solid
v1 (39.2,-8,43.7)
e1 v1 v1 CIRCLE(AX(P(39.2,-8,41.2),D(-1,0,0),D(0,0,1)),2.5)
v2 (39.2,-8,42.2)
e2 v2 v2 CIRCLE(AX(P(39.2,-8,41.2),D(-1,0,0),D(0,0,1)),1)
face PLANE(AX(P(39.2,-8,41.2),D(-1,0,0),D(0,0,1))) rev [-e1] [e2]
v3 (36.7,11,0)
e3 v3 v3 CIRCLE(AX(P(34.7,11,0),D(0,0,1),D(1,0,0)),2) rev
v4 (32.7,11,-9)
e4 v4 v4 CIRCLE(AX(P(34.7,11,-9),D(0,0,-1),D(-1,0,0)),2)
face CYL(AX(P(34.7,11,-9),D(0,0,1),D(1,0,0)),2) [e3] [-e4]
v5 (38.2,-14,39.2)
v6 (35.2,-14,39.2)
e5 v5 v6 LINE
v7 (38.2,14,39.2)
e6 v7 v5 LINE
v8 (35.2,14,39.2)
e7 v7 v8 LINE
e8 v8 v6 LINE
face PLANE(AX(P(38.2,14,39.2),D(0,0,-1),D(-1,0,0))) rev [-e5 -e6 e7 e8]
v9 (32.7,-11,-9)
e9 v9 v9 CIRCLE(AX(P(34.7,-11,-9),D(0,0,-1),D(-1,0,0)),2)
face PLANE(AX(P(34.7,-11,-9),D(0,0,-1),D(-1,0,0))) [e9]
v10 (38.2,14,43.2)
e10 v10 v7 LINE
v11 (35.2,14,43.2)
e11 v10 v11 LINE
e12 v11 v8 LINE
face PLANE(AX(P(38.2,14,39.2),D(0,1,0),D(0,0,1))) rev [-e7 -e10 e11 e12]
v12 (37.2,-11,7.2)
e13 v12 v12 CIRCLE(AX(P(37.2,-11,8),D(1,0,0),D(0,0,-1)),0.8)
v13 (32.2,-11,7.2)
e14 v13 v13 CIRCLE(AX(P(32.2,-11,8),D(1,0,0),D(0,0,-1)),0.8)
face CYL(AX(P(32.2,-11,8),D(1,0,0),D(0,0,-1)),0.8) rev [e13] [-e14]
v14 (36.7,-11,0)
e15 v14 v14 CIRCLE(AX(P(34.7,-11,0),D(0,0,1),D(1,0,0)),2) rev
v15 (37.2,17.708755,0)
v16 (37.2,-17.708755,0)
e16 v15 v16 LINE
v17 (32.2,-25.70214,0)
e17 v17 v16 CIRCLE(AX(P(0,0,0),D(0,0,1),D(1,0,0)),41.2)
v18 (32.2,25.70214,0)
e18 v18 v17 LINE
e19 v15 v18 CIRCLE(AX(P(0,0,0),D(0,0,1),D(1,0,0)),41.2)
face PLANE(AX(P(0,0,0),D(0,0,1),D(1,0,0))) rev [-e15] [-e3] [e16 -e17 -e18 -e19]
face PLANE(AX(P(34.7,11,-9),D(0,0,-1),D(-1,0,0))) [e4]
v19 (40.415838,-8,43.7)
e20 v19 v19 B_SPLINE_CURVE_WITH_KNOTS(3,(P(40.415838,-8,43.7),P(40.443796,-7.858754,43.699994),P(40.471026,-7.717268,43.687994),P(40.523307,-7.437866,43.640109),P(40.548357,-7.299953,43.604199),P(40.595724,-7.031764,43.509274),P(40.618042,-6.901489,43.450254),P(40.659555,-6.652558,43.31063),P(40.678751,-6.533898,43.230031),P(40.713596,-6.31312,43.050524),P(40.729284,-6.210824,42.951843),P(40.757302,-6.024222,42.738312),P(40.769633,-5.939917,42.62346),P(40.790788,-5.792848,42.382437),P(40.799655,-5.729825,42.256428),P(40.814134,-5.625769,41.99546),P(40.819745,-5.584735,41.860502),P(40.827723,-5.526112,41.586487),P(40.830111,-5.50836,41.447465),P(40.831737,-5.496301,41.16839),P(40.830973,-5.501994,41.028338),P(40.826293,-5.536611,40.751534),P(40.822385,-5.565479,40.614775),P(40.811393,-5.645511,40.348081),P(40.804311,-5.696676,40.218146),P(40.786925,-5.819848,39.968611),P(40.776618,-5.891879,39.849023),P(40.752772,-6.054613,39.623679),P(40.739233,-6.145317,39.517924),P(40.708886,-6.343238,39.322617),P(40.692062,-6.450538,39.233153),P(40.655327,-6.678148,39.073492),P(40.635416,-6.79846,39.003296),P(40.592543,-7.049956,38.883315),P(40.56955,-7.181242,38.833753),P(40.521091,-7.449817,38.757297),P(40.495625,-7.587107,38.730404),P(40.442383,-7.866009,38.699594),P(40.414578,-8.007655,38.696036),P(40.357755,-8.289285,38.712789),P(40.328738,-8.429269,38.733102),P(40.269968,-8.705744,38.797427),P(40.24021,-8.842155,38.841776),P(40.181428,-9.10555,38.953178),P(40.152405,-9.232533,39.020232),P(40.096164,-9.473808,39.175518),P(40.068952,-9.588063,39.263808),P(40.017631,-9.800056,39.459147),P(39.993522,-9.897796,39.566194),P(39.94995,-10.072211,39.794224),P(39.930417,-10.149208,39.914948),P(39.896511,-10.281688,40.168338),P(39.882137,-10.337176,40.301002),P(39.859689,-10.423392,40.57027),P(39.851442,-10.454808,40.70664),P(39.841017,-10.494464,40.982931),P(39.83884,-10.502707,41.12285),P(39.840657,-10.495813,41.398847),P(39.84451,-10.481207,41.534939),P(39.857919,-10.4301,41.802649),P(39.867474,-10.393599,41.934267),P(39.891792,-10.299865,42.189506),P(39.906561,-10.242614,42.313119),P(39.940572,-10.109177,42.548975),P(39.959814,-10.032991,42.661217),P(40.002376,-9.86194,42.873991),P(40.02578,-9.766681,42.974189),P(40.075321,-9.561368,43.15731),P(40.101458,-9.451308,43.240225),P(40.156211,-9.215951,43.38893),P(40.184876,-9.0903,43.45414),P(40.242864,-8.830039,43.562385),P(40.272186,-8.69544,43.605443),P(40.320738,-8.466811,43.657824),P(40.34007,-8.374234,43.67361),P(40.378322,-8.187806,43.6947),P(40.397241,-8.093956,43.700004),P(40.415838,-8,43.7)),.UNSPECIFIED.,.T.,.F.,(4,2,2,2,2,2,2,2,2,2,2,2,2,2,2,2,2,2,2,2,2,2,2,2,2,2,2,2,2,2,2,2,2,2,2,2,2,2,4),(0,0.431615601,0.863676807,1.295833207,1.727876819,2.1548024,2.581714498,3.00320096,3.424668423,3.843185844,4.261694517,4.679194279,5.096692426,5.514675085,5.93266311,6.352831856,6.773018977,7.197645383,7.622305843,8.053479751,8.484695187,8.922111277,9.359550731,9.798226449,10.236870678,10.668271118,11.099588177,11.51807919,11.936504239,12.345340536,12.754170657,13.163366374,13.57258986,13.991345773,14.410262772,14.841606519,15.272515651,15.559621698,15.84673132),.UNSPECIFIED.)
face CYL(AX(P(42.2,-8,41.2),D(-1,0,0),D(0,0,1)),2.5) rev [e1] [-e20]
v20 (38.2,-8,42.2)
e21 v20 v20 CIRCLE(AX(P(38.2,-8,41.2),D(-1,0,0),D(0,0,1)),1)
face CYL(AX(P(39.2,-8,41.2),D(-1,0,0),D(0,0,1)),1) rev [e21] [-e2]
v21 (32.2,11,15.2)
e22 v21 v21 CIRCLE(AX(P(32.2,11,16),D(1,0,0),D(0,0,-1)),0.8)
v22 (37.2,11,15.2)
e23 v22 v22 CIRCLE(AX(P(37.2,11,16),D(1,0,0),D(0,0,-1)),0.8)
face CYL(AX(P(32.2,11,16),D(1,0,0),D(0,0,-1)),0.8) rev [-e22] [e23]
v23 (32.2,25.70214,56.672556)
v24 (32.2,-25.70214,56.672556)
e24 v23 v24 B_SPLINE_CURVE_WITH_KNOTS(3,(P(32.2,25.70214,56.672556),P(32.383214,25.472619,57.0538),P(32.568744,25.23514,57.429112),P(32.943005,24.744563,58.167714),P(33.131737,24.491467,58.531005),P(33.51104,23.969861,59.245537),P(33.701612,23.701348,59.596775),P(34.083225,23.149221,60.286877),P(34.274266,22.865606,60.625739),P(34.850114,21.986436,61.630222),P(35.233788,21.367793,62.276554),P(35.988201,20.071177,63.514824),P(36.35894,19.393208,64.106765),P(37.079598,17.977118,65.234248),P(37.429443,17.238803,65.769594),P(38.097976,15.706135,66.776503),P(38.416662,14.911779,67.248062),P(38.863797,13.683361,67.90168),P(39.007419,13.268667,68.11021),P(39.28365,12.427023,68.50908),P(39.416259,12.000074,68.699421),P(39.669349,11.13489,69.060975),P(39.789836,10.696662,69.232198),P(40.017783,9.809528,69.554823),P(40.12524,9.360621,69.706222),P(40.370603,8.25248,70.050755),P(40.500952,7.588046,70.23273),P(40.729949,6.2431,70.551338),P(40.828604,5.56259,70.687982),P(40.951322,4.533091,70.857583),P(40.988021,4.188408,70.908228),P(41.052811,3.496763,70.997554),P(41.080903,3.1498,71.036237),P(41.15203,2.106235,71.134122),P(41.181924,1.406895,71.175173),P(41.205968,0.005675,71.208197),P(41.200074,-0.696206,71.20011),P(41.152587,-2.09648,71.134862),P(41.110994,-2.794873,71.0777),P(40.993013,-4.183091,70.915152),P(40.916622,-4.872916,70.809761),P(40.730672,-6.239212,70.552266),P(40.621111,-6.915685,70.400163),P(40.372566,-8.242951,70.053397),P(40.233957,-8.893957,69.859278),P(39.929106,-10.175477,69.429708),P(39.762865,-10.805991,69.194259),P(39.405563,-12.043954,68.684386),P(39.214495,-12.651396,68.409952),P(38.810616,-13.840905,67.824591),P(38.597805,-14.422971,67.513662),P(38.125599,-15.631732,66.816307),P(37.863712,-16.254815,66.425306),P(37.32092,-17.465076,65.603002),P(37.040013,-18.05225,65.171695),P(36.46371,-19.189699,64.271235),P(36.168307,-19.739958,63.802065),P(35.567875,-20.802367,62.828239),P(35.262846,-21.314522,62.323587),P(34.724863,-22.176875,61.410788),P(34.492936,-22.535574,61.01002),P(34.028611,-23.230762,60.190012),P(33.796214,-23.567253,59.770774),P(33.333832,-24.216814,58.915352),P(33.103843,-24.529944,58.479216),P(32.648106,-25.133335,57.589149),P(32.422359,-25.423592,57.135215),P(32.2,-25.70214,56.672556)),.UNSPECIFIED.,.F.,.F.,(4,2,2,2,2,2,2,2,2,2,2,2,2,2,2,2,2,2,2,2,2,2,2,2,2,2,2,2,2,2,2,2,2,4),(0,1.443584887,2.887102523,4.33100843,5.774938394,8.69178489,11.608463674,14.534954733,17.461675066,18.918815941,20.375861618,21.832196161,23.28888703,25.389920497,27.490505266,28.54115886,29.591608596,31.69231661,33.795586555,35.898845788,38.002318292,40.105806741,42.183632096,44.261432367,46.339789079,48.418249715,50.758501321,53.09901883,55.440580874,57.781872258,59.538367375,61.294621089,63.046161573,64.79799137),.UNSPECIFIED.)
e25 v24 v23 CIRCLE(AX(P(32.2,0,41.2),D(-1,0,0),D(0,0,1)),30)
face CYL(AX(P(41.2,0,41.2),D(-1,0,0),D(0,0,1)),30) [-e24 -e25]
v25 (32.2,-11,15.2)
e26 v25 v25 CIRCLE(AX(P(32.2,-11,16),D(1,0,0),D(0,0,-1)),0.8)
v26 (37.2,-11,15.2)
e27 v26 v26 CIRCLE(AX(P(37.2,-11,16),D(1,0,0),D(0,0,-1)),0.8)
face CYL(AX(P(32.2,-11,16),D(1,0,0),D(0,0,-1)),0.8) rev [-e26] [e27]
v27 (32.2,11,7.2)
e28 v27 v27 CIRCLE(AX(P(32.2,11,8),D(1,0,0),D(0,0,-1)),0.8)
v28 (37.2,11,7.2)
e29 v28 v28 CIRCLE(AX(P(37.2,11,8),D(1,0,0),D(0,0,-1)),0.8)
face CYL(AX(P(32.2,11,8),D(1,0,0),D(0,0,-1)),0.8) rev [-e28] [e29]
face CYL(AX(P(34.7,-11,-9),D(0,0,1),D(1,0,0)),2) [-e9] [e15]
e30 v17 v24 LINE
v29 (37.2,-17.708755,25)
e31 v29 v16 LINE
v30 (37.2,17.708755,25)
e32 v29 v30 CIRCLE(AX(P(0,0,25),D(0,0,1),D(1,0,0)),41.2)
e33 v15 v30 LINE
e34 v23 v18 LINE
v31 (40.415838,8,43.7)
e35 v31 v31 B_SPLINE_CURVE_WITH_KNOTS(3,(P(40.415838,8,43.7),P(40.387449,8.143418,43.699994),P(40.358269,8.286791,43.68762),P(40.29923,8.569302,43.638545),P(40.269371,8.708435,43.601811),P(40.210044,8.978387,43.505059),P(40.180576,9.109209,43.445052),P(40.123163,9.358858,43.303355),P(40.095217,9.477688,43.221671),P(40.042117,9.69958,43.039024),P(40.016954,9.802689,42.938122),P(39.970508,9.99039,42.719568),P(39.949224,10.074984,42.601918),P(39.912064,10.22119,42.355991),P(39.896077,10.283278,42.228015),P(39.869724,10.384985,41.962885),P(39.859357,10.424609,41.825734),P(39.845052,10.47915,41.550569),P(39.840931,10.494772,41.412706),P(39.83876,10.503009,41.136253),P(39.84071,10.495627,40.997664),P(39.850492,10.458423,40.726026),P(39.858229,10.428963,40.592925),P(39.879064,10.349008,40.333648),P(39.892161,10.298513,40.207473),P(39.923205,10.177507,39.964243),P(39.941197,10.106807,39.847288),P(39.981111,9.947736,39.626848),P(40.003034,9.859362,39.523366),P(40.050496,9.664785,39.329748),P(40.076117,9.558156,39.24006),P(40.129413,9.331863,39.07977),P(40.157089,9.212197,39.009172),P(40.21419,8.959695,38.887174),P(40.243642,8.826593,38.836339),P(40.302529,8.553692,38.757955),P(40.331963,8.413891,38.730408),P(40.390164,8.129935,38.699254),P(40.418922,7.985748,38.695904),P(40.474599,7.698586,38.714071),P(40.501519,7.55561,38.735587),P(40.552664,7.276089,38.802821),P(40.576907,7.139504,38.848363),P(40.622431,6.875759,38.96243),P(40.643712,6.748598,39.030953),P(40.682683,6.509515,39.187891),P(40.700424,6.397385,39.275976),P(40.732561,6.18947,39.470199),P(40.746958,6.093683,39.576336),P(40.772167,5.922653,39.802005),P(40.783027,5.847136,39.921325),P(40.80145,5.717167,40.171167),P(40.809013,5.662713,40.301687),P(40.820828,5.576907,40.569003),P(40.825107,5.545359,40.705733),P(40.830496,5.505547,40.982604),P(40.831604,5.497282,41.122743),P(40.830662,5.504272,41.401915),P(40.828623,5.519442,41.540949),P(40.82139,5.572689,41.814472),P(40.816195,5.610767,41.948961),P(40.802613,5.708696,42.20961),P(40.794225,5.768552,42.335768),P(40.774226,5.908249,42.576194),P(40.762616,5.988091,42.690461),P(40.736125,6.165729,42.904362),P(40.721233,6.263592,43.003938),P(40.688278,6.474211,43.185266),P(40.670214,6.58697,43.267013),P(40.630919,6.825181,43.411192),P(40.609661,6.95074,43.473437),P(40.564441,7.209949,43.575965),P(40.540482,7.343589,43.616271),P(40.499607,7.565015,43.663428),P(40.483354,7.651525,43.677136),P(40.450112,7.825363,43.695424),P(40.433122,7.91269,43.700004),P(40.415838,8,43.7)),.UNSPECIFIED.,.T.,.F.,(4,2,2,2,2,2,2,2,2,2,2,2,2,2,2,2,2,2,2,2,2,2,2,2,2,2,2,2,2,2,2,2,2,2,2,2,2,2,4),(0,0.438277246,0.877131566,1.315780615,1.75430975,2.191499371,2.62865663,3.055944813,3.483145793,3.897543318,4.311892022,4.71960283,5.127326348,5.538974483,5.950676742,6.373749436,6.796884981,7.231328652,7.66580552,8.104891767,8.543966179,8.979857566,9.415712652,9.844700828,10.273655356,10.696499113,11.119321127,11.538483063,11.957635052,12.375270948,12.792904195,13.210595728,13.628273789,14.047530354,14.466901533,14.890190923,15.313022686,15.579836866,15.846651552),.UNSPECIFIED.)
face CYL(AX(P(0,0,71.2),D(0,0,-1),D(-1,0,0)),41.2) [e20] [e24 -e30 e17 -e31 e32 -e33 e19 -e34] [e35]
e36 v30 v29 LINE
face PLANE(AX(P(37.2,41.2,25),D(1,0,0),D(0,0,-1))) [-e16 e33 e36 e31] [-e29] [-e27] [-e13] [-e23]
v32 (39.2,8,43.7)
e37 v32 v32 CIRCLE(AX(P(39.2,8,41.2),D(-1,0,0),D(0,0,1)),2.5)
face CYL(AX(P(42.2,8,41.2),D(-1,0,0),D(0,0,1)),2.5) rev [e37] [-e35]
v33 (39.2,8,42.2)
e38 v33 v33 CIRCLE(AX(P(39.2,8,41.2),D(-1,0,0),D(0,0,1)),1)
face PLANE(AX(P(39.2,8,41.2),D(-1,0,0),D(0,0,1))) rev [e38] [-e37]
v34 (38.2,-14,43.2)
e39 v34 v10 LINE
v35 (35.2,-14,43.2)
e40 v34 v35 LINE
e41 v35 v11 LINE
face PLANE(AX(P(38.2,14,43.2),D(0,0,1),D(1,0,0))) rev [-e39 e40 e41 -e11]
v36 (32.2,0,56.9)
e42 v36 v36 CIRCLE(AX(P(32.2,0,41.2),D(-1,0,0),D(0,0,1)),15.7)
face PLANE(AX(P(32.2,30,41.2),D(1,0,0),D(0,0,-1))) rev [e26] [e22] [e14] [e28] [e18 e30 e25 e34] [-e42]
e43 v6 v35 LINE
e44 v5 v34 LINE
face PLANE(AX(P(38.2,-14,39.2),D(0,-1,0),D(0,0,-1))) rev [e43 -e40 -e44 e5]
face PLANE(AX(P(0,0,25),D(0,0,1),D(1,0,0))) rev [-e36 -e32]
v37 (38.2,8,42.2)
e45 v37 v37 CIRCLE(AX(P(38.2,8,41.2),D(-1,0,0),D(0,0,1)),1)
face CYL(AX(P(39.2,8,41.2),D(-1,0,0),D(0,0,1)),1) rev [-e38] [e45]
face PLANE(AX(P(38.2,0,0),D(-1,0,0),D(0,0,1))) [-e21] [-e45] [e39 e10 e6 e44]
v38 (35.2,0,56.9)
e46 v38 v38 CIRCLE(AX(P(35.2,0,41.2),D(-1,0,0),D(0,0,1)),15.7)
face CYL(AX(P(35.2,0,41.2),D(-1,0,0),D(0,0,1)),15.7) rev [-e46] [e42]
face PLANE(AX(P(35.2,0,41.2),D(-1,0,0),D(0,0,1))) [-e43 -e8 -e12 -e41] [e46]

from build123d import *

# Parameters (mm, degrees)
SKETCH_1_W          = 9
SKETCH_1_H          = 60
EXTRUDE_1_DEPTH     = 41.2
SKETCH_4_R          = 30
EXTRUDE_3_DEPTH     = 9
CUT_EXTRUDE_1_DEPTH = 72
SKETCH_5_R          = 15.7
CUT_EXTRUDE_2_DEPTH = 3
SKETCH_6_W          = 4
SKETCH_6_H          = 28
CUT_EXTRUDE_3_DEPTH = 3
SKETCH_7_R          = 2
EXTRUDE_4_DEPTH     = 9
SKETCH_8_W          = 4
SKETCH_8_H          = 82.4
CUT_EXTRUDE_4_DEPTH = 25
SKETCH_9_R          = 0.8
CUT_EXTRUDE_5_DEPTH = 5
SKETCH_10_R         = 1
CUT_EXTRUDE_6_DEPTH = 1
SKETCH_11_R         = 2.5
CUT_EXTRUDE_7_DEPTH = 3


with BuildPart() as part:
    # 草图1 → 凸台-拉伸1 (new body)
    with BuildSketch(Plane.XY):
        with Locations((36.7, 0)):
            Rectangle(SKETCH_1_W, SKETCH_1_H)
    extrude(amount=EXTRUDE_1_DEPTH)

    # 草图4 → 凸台-拉伸3 (add)
    with BuildSketch(Plane.ZY.offset(-32.2)):
        with Locations((41.2, 0)):
            Circle(SKETCH_4_R)
    extrude(amount=-EXTRUDE_3_DEPTH)

    # 切除-拉伸1: read off the stored shape, not the designer's step
    # 切除-拉伸1 outline → 切除-拉伸1 (cut)
    with BuildSketch(Plane.XY):
        with BuildLine():
            Line((32.2, 30), (32.2, 25.702139989))
            ThreePointArc((32.2, 25.702139989), (38.884958532, 13.616166862), (41.2, 0))
            Line((41.2, 0), (41.2, 30))
            Line((41.2, 30), (32.2, 30))
        make_face()
        with BuildLine():
            Line((41.2, -30), (41.2, 0))
            ThreePointArc((41.2, 0), (38.884958532, -13.616166862), (32.2, -25.702139989))
            Line((32.2, -25.702139989), (32.2, -30))
            Line((32.2, -30), (41.2, -30))
        make_face()
    extrude(amount=CUT_EXTRUDE_1_DEPTH, mode=Mode.SUBTRACT)

    # 草图5 → 切除-拉伸2 (cut)
    with BuildSketch(Plane.ZY.offset(-32.2)):
        with Locations((41.2, 0)):
            Circle(SKETCH_5_R)
    extrude(amount=-CUT_EXTRUDE_2_DEPTH, mode=Mode.SUBTRACT)

    # 草图6 → 切除-拉伸3 (cut)
    with BuildSketch(Plane.ZY.offset(-35.2)):
        with Locations((41.2, 0)):
            Rectangle(SKETCH_6_W, SKETCH_6_H)
    extrude(amount=-CUT_EXTRUDE_3_DEPTH, mode=Mode.SUBTRACT)

    # 草图7 → 凸台-拉伸4 (add)
    with BuildSketch(Plane(origin=(0, 0, 0), x_dir=(-1, 0, 0), z_dir=(0, 0, -1))):
        with Locations(Location((-34.7, 11, 0), (0, 0, 180))):
            Circle(SKETCH_7_R)
        with Locations(Location((-34.7, -11, 0), (0, 0, 180))):
            Circle(SKETCH_7_R)
    extrude(amount=EXTRUDE_4_DEPTH)

    # 草图8 → 切除-拉伸4 (cut)
    with BuildSketch(Plane.XY):
        with Locations((39.2, 0)):
            Rectangle(SKETCH_8_W, SKETCH_8_H)
    extrude(amount=CUT_EXTRUDE_4_DEPTH, mode=Mode.SUBTRACT)

    # 草图9 → 切除-拉伸5 (cut)
    with BuildSketch(Plane(origin=(37.2, 0, 0), x_dir=(0, 0, -1), z_dir=(1, 0, 0))):
        with Locations((-16, -11)):
            Circle(SKETCH_9_R)
        with Locations((-8, -11)):
            Circle(SKETCH_9_R)
        with Locations((-16, 11)):
            Circle(SKETCH_9_R)
        with Locations((-8, 11)):
            Circle(SKETCH_9_R)
    extrude(amount=-CUT_EXTRUDE_5_DEPTH, mode=Mode.SUBTRACT)

    # 草图10 → 切除-拉伸6 (cut)
    with BuildSketch(Plane.ZY.offset(-38.2)):
        with Locations((41.2, 8)):
            Circle(SKETCH_10_R)
        with Locations((41.2, -8)):
            Circle(SKETCH_10_R)
    extrude(amount=-CUT_EXTRUDE_6_DEPTH, mode=Mode.SUBTRACT)

    # 草图11 → 切除-拉伸7 (cut)
    with BuildSketch(Plane.ZY.offset(-39.2)):
        with Locations((41.2, 8)):
            Circle(SKETCH_11_R)
        with Locations((41.2, -8)):
            Circle(SKETCH_11_R)
    extrude(amount=-CUT_EXTRUDE_7_DEPTH, mode=Mode.SUBTRACT)


solid = part.part
